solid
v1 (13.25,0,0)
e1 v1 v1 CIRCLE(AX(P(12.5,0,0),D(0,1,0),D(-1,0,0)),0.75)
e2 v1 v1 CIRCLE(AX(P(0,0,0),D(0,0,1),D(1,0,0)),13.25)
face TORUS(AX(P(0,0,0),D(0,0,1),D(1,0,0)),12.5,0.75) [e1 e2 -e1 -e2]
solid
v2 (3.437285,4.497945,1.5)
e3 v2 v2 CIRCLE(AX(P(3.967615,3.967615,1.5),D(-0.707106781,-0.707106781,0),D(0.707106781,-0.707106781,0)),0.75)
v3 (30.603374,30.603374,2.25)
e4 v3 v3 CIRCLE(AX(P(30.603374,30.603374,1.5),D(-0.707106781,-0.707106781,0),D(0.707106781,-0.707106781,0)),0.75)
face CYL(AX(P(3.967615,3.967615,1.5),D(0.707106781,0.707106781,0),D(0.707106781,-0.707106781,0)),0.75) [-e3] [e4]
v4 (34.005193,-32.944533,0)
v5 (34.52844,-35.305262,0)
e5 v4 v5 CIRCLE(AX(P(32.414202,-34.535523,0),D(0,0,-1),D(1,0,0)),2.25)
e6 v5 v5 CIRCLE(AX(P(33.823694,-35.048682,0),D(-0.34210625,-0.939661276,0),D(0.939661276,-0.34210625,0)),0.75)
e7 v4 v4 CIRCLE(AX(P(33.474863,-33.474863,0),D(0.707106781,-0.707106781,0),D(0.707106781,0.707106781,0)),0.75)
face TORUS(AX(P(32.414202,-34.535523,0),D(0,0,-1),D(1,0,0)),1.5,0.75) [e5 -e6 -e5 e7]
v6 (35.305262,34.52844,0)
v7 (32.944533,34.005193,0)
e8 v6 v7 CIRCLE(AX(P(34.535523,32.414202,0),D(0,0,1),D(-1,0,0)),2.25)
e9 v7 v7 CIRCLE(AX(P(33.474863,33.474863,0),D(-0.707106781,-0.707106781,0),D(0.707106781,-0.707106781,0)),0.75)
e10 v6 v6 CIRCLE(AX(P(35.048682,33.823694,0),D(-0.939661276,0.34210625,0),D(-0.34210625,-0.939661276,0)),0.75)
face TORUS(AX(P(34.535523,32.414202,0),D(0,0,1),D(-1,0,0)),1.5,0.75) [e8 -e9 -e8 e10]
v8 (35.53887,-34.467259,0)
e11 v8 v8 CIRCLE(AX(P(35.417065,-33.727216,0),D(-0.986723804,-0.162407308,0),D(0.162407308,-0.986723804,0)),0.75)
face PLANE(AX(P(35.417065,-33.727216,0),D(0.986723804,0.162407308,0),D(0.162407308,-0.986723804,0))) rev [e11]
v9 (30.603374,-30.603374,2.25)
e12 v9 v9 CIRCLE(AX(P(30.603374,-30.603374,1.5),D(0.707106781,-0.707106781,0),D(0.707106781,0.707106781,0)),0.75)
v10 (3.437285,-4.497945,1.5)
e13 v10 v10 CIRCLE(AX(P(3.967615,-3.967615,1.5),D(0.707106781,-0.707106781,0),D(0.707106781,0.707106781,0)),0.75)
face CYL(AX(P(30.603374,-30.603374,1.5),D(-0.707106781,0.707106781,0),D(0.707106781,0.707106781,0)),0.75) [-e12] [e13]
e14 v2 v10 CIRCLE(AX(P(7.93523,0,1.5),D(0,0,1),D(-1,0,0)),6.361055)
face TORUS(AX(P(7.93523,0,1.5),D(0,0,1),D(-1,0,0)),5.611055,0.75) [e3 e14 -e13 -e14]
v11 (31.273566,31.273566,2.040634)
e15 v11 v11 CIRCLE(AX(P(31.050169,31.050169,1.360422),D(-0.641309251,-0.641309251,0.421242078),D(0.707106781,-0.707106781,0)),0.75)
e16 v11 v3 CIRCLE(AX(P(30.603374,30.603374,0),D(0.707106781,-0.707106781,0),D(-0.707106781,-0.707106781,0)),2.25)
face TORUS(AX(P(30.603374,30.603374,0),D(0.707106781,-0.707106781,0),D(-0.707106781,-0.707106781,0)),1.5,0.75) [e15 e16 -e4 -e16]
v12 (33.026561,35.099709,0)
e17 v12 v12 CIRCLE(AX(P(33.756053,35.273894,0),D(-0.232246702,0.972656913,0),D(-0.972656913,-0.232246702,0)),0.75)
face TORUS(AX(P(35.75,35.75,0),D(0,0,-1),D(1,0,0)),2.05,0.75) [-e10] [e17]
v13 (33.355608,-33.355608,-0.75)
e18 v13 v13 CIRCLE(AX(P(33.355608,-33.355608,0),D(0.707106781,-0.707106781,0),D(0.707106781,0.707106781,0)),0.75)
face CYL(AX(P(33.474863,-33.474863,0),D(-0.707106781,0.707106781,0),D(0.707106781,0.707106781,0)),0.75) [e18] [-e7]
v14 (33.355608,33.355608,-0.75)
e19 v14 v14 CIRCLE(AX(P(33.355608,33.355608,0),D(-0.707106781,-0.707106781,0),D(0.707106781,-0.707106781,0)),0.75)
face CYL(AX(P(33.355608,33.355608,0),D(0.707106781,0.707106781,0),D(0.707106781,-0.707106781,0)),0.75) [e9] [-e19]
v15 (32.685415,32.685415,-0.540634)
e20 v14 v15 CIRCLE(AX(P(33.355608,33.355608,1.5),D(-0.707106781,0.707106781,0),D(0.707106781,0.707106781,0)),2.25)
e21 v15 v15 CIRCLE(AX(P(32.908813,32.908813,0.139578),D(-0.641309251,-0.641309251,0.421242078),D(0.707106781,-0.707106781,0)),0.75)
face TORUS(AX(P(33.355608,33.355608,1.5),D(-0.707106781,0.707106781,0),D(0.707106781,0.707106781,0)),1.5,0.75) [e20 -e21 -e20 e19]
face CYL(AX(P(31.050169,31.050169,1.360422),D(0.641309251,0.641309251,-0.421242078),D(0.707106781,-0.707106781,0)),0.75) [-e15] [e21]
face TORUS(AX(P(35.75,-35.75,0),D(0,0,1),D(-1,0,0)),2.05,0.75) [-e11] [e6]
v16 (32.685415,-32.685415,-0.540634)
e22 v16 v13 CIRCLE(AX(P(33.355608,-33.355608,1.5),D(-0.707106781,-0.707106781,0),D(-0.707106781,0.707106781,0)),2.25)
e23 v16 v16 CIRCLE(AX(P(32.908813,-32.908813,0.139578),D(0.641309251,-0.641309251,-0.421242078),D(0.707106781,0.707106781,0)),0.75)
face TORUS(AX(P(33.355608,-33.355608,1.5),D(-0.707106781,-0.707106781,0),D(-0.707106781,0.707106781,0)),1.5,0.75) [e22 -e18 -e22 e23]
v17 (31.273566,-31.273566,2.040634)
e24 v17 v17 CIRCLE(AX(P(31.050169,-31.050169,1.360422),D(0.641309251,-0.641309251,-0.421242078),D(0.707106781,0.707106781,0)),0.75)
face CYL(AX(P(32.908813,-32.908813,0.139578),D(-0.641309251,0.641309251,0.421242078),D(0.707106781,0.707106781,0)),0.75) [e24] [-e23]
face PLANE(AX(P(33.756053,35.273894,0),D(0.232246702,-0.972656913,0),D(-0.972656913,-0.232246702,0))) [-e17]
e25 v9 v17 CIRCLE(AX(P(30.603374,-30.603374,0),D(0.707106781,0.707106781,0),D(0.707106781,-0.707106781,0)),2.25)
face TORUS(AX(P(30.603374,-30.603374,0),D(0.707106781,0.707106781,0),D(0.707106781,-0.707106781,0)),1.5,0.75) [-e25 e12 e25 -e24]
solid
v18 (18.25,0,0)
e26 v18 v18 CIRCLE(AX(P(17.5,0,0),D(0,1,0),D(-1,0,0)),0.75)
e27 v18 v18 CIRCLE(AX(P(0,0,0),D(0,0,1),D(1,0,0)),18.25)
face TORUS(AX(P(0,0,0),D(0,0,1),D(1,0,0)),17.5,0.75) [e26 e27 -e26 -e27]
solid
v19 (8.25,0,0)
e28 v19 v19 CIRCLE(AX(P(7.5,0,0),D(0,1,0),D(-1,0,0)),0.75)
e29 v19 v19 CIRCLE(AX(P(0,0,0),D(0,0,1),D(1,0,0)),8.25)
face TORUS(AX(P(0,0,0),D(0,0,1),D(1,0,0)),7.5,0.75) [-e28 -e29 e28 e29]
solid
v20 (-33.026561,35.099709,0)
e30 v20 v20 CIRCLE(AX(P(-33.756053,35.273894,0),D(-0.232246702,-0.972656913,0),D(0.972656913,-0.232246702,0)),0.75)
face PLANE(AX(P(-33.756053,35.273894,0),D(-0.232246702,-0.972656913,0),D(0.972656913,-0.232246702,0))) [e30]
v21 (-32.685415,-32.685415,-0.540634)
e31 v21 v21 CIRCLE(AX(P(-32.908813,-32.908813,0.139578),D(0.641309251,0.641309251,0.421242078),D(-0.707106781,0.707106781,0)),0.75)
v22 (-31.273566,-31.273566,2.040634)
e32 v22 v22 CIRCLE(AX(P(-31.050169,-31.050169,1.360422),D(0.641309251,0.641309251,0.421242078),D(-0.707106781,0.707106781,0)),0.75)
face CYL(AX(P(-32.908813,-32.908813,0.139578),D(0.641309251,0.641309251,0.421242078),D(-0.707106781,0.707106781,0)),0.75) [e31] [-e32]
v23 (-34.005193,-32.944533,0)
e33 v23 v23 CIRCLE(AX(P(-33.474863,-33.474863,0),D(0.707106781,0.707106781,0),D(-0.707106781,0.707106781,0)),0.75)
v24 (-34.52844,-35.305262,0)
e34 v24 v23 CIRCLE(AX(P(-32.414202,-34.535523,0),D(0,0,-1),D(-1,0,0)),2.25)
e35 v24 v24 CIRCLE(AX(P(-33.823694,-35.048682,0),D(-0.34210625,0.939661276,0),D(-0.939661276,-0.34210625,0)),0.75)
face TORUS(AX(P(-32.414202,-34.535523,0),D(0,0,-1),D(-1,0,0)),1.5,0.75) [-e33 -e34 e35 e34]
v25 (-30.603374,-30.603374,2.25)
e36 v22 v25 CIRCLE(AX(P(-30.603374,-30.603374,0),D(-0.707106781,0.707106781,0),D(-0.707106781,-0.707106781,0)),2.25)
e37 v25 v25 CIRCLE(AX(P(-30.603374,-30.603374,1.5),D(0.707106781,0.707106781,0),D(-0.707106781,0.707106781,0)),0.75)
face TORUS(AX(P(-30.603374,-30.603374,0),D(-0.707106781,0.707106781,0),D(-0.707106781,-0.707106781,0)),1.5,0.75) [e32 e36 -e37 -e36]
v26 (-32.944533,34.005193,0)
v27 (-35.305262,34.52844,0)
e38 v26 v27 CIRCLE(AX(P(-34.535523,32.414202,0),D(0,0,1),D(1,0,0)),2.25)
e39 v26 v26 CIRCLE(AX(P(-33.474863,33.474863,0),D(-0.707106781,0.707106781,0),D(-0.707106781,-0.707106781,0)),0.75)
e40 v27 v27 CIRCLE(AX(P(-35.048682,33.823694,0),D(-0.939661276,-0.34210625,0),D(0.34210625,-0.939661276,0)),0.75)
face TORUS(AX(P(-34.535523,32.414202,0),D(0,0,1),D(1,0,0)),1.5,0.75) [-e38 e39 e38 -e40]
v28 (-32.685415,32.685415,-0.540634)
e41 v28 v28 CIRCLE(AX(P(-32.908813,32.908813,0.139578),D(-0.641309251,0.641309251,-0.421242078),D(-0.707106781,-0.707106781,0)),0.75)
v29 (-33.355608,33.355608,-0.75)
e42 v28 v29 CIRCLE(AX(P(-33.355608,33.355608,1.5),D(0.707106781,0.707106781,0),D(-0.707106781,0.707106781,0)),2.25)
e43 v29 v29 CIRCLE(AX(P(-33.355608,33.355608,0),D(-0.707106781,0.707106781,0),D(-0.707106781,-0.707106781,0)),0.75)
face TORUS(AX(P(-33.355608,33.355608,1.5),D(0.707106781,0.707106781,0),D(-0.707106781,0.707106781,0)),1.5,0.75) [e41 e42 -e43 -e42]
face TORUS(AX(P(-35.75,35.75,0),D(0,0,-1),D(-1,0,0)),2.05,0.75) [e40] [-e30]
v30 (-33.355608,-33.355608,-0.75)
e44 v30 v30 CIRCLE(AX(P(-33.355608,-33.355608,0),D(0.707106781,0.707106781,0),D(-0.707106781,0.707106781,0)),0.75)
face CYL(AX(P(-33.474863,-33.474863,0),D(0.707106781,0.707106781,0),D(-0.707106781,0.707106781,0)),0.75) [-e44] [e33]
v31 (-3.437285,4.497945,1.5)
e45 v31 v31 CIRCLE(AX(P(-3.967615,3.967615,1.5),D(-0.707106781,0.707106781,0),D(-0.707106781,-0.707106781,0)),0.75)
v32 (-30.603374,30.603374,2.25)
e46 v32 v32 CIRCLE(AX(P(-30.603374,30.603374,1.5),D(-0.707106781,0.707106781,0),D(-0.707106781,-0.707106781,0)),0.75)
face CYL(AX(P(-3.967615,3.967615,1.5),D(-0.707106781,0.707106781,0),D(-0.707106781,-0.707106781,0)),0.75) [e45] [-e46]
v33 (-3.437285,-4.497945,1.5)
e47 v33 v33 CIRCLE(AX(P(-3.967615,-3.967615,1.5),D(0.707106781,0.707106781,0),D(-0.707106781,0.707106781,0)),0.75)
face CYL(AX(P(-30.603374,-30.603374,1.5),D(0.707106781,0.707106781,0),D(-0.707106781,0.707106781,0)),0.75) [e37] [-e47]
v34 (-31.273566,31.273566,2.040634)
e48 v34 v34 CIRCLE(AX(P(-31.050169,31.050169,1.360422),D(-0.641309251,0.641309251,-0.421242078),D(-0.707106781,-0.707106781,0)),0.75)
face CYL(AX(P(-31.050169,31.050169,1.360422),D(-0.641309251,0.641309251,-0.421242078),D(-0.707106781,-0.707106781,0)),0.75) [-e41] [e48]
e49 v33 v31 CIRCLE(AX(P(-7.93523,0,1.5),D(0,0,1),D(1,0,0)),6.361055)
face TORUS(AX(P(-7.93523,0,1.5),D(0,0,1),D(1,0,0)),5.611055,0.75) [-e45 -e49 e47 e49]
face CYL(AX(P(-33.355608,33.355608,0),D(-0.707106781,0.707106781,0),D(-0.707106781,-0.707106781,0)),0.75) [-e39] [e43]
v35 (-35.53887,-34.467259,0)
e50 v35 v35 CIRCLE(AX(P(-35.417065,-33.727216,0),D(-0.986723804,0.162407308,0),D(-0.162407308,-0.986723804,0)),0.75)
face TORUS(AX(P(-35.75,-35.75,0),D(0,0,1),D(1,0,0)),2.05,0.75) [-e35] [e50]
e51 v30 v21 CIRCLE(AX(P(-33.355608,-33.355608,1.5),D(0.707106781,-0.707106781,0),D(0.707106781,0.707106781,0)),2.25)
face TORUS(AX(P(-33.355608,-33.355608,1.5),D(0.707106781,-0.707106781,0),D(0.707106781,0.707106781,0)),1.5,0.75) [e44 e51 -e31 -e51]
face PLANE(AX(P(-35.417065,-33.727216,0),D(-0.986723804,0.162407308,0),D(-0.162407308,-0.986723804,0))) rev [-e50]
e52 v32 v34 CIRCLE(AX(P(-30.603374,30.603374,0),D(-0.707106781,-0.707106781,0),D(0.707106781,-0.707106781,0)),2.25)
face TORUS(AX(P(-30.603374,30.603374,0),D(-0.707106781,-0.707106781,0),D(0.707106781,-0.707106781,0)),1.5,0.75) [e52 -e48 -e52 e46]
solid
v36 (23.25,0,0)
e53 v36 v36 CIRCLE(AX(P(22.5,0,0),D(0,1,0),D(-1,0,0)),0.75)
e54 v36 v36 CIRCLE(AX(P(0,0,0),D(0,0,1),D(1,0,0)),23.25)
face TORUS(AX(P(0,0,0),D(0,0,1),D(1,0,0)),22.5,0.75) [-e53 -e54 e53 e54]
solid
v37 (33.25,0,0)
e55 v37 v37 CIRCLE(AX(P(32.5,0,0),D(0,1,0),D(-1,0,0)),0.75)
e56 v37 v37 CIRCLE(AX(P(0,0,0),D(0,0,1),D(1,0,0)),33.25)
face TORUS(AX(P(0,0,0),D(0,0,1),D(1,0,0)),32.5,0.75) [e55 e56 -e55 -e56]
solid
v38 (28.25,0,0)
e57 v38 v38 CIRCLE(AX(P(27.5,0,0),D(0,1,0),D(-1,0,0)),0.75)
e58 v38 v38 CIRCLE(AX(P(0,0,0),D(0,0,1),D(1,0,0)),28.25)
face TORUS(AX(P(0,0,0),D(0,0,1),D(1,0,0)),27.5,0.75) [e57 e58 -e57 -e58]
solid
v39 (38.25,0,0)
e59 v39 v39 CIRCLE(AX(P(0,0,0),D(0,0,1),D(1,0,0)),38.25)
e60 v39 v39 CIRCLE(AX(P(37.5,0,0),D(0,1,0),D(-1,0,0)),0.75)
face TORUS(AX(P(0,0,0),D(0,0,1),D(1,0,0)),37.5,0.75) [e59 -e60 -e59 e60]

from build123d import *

# Parameters (mm, degrees)
SWEEP2_PROFILE_R     = 0.75
SWEEP3_PROFILE_R     = 0.75
SWEEP4_PROFILE_R     = 0.75
SWEEP5_PROFILE_R     = 0.75
SWEEP6_PROFILE_R     = 0.75
SWEEP7_PROFILE_R     = 0.75
SWEEP8_PROFILE_R     = 0.75
SWEEP10_OUTLINE_R    = 0.75
SWEEP10_ANGLE        = 299.351903
SWEEP10_2_OUTLINE_R  = 0.75
SWEEP10_2_ANGLE      = 65.00525
SWEEP10_3_OUTLINE_R  = 0.75
SWEEP10_3_ANGLE      = 24.91303
SWEEP10_4_OUTLINE_R  = 0.75
SWEEP10_4_ANGLE      = 24.91303
SWEEP10_5_OUTLINE_R  = 0.75
SWEEP10_5_ANGLE      = 90
SWEEP10_6_OUTLINE_R  = 0.75
SWEEP10_6_ANGLE      = 24.91303
SWEEP10_7_OUTLINE_R  = 0.75
SWEEP10_7_ANGLE      = 24.91303
SWEEP10_8_OUTLINE_R  = 0.75
SWEEP10_8_ANGLE      = 65.00525
SWEEP10_9_OUTLINE_R  = 0.75
SWEEP10_9_ANGLE      = 303.434631
SWEEP10_START        = -47.340604846
SWEEP10_10_OUTLINE_R = 0.75
SWEEP10_10_DEPTH     = 0.168652393
SWEEP10_START_2      = -42.150656374
SWEEP10_11_OUTLINE_R = 0.75
SWEEP10_11_DEPTH     = 2.898202414
SWEEP10_START_3      = -43.279707019
SWEEP10_12_OUTLINE_R = 0.75
SWEEP10_12_DEPTH     = 37.668652394
SWEEP10_13_OUTLINE_R = 0.75
SWEEP10_13_DEPTH     = 37.668652394
SWEEP10_14_OUTLINE_R = 0.75
SWEEP10_14_DEPTH     = 2.898202414
SWEEP10_15_OUTLINE_R = 0.75
SWEEP10_15_DEPTH     = 0.168652393


with BuildPart() as part:
    # Sweep2: sweep along a path in Sketch1
    with BuildLine(Plane.XY) as sweep2_path:
        CenterArc((0, 0), 7.5, 0, 360)
    # Sweep2 profile (on start of the path) → Sweep2 (sweep)
    with BuildSketch(Plane(origin=(7.5, 0, 0), x_dir=(0, 0, 1), z_dir=(0, 1, 0))):
        Circle(SWEEP2_PROFILE_R)
    sweep(path=sweep2_path.line)


with BuildPart() as body_2:
    # Sweep3: sweep along a path in Sketch38
    with BuildLine(Plane.XY) as sweep3_path:
        CenterArc((0, 0), 12.5, 0, 360)
    # Sweep3 profile (on start of the path) → Sweep3 (sweep)
    with BuildSketch(Plane(origin=(12.5, 0, 0), x_dir=(0, 0, 1), z_dir=(0, 1, 0))):
        Circle(SWEEP3_PROFILE_R)
    sweep(path=sweep3_path.line)


with BuildPart() as body_3:
    # Sweep4: sweep along a path in Sketch51
    with BuildLine(Plane.XY) as sweep4_path:
        CenterArc((0, 0), 17.5, 0, 360)
    # Sweep4 profile (on start of the path) → Sweep4 (sweep)
    with BuildSketch(Plane(origin=(17.5, 0, 0), x_dir=(0, 0, 1), z_dir=(0, 1, 0))):
        Circle(SWEEP4_PROFILE_R)
    sweep(path=sweep4_path.line)


with BuildPart() as body_4:
    # Sweep5: sweep along a path in Sketch76
    with BuildLine(Plane.XY) as sweep5_path:
        CenterArc((0, 0), 22.5, 0, 360)
    # Sweep5 profile (on start of the path) → Sweep5 (sweep)
    with BuildSketch(Plane(origin=(22.5, 0, 0), x_dir=(0, 0, 1), z_dir=(0, 1, 0))):
        Circle(SWEEP5_PROFILE_R)
    sweep(path=sweep5_path.line)


with BuildPart() as body_5:
    # Sweep6: sweep along a path in Sketch89
    with BuildLine(Plane.XY) as sweep6_path:
        CenterArc((0, 0), 27.5, 0, 360)
    # Sweep6 profile (on start of the path) → Sweep6 (sweep)
    with BuildSketch(Plane(origin=(27.5, 0, 0), x_dir=(0, 0, 1), z_dir=(0, 1, 0))):
        Circle(SWEEP6_PROFILE_R)
    sweep(path=sweep6_path.line)


with BuildPart() as body_6:
    # Sweep7: sweep along a path in Sketch99
    with BuildLine(Plane.XY) as sweep7_path:
        CenterArc((0, 0), 32.5, 0, 360)
    # Sweep7 profile (on start of the path) → Sweep7 (sweep)
    with BuildSketch(Plane(origin=(32.5, 0, 0), x_dir=(0, 0, 1), z_dir=(0, 1, 0))):
        Circle(SWEEP7_PROFILE_R)
    sweep(path=sweep7_path.line)


with BuildPart() as body_7:
    # Sweep8: sweep along a path in Sketch108
    with BuildLine(Plane.XY) as sweep8_path:
        CenterArc((0, 0), 37.5, 0, 360)
    # Sweep8 profile (on start of the path) → Sweep8 (sweep)
    with BuildSketch(Plane(origin=(37.5, 0, 0), x_dir=(0, 0, 1), z_dir=(0, 1, 0))):
        Circle(SWEEP8_PROFILE_R)
    sweep(path=sweep8_path.line)


with BuildPart() as body_8:
    # Sweep10: read off the stored shape, not the designer's step
    # Sweep10 outline → Sweep10 (revolve)
    with BuildSketch(Plane(origin=(-35.75, -35.75, 0), x_dir=(0.1624073083987901, 0.9867238044045863, 0), z_dir=(0.9867238044045863, -0.1624073083987901, 0))):
        with Locations((2.05, 0)):
            Circle(SWEEP10_OUTLINE_R)
    revolve(axis=Axis((-35.75, -35.75, 0), (0, 0, 1)), revolution_arc=SWEEP10_ANGLE)

    # Sweep10 2 outline → Sweep10 2 (revolve)
    with BuildSketch(Plane(origin=(-32.41420247, -34.535522813, 0), x_dir=(-0.7071067811867158, 0.7071067811863793, 0), z_dir=(0.7071067811863793, 0.7071067811867158, 0))):
        with Locations((1.5, 0)):
            Circle(SWEEP10_2_OUTLINE_R)
    revolve(axis=Axis((-32.41420247, -34.535522813, 0), (0, 0, 1)), revolution_arc=SWEEP10_2_ANGLE)

    # Sweep10 3 outline → Sweep10 3 (revolve)
    with BuildSketch(Plane(origin=(-33.355607532, -33.355607532, 1.5), x_dir=(0, 0, -1), z_dir=(-0.707106781186402, -0.707106781186693, -2.2816783892076807e-15))):
        with Locations((1.5, 0)):
            Circle(SWEEP10_3_OUTLINE_R)
    revolve(axis=Axis((-33.355607532, -33.355607532, 1.5), (0.707106781186693, -0.707106781186402, 0)), revolution_arc=SWEEP10_3_ANGLE)

    # Sweep10 4 outline → Sweep10 4 (revolve)
    with BuildSketch(Plane(origin=(-30.60337425, -30.60337425, 0), x_dir=(0, 0, 1), z_dir=(0.70710678118655, 0.707106781186545, -3.8359906236829e-15))):
        with Locations((1.5, 0)):
            Circle(SWEEP10_4_OUTLINE_R)
    revolve(axis=Axis((-30.60337425, -30.60337425, 0), (0.707106781186545, -0.70710678118655, 0)), revolution_arc=SWEEP10_4_ANGLE)

    # Sweep10 5 outline → Sweep10 5 (revolve)
    with BuildSketch(Plane(origin=(-7.935229692, 0, 0), x_dir=(0.7071067811865476, -0.7071067811865475, 0), z_dir=(-0.7071067811865475, -0.7071067811865476, 0))):
        with Locations((5.611054725, 1.5)):
            Circle(SWEEP10_5_OUTLINE_R)
    revolve(axis=Axis((-7.935229692, 0, 0), (0, 0, 1)), revolution_arc=SWEEP10_5_ANGLE)

    # Sweep10 6 outline → Sweep10 6 (revolve)
    with BuildSketch(Plane(origin=(-30.60337425, 30.60337425, 0), x_dir=(-0.2978631298041014, 0.2978631298041026, 0.9069482409744282), z_dir=(-0.6413092513782278, 0.6413092513782305, -0.4212420778998587))):
        with Locations((1.5, 0)):
            Circle(SWEEP10_6_OUTLINE_R)
    revolve(axis=Axis((-30.60337425, 30.60337425, 0), (0.707106781186549, 0.7071067811865461, 0)), revolution_arc=SWEEP10_6_ANGLE)

    # Sweep10 7 outline → Sweep10 7 (revolve)
    with BuildSketch(Plane(origin=(-33.355607532, 33.355607532, 1.5), x_dir=(0.2978631298041064, -0.29786312980410656, -0.9069482409744252), z_dir=(0.641309251378227, -0.641309251378227, 0.42124207789986506))):
        with Locations((1.5, 0)):
            Circle(SWEEP10_7_OUTLINE_R)
    revolve(axis=Axis((-33.355607532, 33.355607532, 1.5), (0.7071067811865476, 0.7071067811865475, 0)), revolution_arc=SWEEP10_7_ANGLE)

    # Sweep10 8 outline → Sweep10 8 (revolve)
    with BuildSketch(Plane(origin=(-34.535522813, 32.41420247, 0), x_dir=(0.7071067811865493, 0.7071067811865457, 0), z_dir=(0.7071067811865457, -0.7071067811865493, 0))):
        with Locations((1.5, 0)):
            Circle(SWEEP10_8_OUTLINE_R)
    revolve(axis=Axis((-34.535522813, 32.41420247, 0), (0, 0, 1)), revolution_arc=SWEEP10_8_ANGLE)

    # Sweep10 9 outline → Sweep10 9 (revolve)
    with BuildSketch(Plane(origin=(-35.75, 35.75, 0), x_dir=(0.9726569125265558, -0.23224670183730892, 0), z_dir=(-0.23224670183730892, -0.9726569125265558, 0))):
        with Locations((2.05, 0)):
            Circle(SWEEP10_9_OUTLINE_R)
    revolve(axis=Axis((-35.75, 35.75, 0), (0, 0, 1)), revolution_arc=SWEEP10_9_ANGLE)

    # Sweep10 10 outline → Sweep10 10 (add)
    with BuildSketch(Plane(origin=(0, 0, 0), x_dir=(0.7071067811866915, -0.7071067811864037, 0), z_dir=(0.7071067811864036, 0.7071067811866916, 0)).offset(SWEEP10_START)):
        Circle(SWEEP10_10_OUTLINE_R)
    extrude(amount=SWEEP10_10_DEPTH)

    # Sweep10 11 outline → Sweep10 11 (add)
    with BuildSketch(Plane(origin=(0, 0, 0), x_dir=(0.7672825060541113, -0.5360184191066626, -0.35208210730128936), z_dir=(0.641309251378243, 0.641309251378244, 0.421242077899815)).offset(SWEEP10_START_2)):
        with Locations((-7.659769342, -18.183770673)):
            Circle(SWEEP10_11_OUTLINE_R)
    extrude(amount=SWEEP10_11_DEPTH)

    # Sweep10 12 outline → Sweep10 12 (add)
    with BuildSketch(Plane(origin=(0, 0, 0), x_dir=(0.7071067811865471, -0.707106781186548, 0), z_dir=(0.707106781186548, 0.707106781186547, 0)).offset(SWEEP10_START_3)):
        with Locations((0, -1.5)):
            Circle(SWEEP10_12_OUTLINE_R)
    extrude(amount=SWEEP10_12_DEPTH)

    # Sweep10 13 outline → Sweep10 13 (add)
    with BuildSketch(Plane(origin=(0, 0, 0), x_dir=(0.7071067811865474, 0.7071067811865477, 0), z_dir=(0.7071067811865476, -0.7071067811865476, 0)).offset(SWEEP10_START_3)):
        with Locations((0, 1.5)):
            Circle(SWEEP10_13_OUTLINE_R)
    extrude(amount=SWEEP10_13_DEPTH)

    # Sweep10 14 outline → Sweep10 14 (add)
    with BuildSketch(Plane(origin=(0, 0, 0), x_dir=(0.767282506054122, 0.5360184191066334, -0.3520821073013112), z_dir=(0.6413092513782304, -0.6413092513782304, 0.4212420778998552)).offset(SWEEP10_START_2)):
        with Locations((-7.659769342, 18.183770673)):
            Circle(SWEEP10_14_OUTLINE_R)
    extrude(amount=SWEEP10_14_DEPTH)

    # Sweep10 15 outline → Sweep10 15 (add)
    with BuildSketch(Plane(origin=(0, 0, 0), x_dir=(0.7071067811865474, 0.7071067811865477, 0), z_dir=(0.7071067811865476, -0.7071067811865476, 0)).offset(SWEEP10_START)):
        Circle(SWEEP10_15_OUTLINE_R)
    extrude(amount=SWEEP10_15_DEPTH)


with BuildPart() as body_9:
    # Mirror1: mirrored copy
    add(body_8.part.mirror(Plane(origin=(0, 0, 0), x_dir=(0, 0, 1), z_dir=(1, 0, 0))))


solid = Compound([part.part, body_2.part, body_3.part, body_4.part, body_5.part, body_6.part, body_7.part, body_8.part, body_9.part])
